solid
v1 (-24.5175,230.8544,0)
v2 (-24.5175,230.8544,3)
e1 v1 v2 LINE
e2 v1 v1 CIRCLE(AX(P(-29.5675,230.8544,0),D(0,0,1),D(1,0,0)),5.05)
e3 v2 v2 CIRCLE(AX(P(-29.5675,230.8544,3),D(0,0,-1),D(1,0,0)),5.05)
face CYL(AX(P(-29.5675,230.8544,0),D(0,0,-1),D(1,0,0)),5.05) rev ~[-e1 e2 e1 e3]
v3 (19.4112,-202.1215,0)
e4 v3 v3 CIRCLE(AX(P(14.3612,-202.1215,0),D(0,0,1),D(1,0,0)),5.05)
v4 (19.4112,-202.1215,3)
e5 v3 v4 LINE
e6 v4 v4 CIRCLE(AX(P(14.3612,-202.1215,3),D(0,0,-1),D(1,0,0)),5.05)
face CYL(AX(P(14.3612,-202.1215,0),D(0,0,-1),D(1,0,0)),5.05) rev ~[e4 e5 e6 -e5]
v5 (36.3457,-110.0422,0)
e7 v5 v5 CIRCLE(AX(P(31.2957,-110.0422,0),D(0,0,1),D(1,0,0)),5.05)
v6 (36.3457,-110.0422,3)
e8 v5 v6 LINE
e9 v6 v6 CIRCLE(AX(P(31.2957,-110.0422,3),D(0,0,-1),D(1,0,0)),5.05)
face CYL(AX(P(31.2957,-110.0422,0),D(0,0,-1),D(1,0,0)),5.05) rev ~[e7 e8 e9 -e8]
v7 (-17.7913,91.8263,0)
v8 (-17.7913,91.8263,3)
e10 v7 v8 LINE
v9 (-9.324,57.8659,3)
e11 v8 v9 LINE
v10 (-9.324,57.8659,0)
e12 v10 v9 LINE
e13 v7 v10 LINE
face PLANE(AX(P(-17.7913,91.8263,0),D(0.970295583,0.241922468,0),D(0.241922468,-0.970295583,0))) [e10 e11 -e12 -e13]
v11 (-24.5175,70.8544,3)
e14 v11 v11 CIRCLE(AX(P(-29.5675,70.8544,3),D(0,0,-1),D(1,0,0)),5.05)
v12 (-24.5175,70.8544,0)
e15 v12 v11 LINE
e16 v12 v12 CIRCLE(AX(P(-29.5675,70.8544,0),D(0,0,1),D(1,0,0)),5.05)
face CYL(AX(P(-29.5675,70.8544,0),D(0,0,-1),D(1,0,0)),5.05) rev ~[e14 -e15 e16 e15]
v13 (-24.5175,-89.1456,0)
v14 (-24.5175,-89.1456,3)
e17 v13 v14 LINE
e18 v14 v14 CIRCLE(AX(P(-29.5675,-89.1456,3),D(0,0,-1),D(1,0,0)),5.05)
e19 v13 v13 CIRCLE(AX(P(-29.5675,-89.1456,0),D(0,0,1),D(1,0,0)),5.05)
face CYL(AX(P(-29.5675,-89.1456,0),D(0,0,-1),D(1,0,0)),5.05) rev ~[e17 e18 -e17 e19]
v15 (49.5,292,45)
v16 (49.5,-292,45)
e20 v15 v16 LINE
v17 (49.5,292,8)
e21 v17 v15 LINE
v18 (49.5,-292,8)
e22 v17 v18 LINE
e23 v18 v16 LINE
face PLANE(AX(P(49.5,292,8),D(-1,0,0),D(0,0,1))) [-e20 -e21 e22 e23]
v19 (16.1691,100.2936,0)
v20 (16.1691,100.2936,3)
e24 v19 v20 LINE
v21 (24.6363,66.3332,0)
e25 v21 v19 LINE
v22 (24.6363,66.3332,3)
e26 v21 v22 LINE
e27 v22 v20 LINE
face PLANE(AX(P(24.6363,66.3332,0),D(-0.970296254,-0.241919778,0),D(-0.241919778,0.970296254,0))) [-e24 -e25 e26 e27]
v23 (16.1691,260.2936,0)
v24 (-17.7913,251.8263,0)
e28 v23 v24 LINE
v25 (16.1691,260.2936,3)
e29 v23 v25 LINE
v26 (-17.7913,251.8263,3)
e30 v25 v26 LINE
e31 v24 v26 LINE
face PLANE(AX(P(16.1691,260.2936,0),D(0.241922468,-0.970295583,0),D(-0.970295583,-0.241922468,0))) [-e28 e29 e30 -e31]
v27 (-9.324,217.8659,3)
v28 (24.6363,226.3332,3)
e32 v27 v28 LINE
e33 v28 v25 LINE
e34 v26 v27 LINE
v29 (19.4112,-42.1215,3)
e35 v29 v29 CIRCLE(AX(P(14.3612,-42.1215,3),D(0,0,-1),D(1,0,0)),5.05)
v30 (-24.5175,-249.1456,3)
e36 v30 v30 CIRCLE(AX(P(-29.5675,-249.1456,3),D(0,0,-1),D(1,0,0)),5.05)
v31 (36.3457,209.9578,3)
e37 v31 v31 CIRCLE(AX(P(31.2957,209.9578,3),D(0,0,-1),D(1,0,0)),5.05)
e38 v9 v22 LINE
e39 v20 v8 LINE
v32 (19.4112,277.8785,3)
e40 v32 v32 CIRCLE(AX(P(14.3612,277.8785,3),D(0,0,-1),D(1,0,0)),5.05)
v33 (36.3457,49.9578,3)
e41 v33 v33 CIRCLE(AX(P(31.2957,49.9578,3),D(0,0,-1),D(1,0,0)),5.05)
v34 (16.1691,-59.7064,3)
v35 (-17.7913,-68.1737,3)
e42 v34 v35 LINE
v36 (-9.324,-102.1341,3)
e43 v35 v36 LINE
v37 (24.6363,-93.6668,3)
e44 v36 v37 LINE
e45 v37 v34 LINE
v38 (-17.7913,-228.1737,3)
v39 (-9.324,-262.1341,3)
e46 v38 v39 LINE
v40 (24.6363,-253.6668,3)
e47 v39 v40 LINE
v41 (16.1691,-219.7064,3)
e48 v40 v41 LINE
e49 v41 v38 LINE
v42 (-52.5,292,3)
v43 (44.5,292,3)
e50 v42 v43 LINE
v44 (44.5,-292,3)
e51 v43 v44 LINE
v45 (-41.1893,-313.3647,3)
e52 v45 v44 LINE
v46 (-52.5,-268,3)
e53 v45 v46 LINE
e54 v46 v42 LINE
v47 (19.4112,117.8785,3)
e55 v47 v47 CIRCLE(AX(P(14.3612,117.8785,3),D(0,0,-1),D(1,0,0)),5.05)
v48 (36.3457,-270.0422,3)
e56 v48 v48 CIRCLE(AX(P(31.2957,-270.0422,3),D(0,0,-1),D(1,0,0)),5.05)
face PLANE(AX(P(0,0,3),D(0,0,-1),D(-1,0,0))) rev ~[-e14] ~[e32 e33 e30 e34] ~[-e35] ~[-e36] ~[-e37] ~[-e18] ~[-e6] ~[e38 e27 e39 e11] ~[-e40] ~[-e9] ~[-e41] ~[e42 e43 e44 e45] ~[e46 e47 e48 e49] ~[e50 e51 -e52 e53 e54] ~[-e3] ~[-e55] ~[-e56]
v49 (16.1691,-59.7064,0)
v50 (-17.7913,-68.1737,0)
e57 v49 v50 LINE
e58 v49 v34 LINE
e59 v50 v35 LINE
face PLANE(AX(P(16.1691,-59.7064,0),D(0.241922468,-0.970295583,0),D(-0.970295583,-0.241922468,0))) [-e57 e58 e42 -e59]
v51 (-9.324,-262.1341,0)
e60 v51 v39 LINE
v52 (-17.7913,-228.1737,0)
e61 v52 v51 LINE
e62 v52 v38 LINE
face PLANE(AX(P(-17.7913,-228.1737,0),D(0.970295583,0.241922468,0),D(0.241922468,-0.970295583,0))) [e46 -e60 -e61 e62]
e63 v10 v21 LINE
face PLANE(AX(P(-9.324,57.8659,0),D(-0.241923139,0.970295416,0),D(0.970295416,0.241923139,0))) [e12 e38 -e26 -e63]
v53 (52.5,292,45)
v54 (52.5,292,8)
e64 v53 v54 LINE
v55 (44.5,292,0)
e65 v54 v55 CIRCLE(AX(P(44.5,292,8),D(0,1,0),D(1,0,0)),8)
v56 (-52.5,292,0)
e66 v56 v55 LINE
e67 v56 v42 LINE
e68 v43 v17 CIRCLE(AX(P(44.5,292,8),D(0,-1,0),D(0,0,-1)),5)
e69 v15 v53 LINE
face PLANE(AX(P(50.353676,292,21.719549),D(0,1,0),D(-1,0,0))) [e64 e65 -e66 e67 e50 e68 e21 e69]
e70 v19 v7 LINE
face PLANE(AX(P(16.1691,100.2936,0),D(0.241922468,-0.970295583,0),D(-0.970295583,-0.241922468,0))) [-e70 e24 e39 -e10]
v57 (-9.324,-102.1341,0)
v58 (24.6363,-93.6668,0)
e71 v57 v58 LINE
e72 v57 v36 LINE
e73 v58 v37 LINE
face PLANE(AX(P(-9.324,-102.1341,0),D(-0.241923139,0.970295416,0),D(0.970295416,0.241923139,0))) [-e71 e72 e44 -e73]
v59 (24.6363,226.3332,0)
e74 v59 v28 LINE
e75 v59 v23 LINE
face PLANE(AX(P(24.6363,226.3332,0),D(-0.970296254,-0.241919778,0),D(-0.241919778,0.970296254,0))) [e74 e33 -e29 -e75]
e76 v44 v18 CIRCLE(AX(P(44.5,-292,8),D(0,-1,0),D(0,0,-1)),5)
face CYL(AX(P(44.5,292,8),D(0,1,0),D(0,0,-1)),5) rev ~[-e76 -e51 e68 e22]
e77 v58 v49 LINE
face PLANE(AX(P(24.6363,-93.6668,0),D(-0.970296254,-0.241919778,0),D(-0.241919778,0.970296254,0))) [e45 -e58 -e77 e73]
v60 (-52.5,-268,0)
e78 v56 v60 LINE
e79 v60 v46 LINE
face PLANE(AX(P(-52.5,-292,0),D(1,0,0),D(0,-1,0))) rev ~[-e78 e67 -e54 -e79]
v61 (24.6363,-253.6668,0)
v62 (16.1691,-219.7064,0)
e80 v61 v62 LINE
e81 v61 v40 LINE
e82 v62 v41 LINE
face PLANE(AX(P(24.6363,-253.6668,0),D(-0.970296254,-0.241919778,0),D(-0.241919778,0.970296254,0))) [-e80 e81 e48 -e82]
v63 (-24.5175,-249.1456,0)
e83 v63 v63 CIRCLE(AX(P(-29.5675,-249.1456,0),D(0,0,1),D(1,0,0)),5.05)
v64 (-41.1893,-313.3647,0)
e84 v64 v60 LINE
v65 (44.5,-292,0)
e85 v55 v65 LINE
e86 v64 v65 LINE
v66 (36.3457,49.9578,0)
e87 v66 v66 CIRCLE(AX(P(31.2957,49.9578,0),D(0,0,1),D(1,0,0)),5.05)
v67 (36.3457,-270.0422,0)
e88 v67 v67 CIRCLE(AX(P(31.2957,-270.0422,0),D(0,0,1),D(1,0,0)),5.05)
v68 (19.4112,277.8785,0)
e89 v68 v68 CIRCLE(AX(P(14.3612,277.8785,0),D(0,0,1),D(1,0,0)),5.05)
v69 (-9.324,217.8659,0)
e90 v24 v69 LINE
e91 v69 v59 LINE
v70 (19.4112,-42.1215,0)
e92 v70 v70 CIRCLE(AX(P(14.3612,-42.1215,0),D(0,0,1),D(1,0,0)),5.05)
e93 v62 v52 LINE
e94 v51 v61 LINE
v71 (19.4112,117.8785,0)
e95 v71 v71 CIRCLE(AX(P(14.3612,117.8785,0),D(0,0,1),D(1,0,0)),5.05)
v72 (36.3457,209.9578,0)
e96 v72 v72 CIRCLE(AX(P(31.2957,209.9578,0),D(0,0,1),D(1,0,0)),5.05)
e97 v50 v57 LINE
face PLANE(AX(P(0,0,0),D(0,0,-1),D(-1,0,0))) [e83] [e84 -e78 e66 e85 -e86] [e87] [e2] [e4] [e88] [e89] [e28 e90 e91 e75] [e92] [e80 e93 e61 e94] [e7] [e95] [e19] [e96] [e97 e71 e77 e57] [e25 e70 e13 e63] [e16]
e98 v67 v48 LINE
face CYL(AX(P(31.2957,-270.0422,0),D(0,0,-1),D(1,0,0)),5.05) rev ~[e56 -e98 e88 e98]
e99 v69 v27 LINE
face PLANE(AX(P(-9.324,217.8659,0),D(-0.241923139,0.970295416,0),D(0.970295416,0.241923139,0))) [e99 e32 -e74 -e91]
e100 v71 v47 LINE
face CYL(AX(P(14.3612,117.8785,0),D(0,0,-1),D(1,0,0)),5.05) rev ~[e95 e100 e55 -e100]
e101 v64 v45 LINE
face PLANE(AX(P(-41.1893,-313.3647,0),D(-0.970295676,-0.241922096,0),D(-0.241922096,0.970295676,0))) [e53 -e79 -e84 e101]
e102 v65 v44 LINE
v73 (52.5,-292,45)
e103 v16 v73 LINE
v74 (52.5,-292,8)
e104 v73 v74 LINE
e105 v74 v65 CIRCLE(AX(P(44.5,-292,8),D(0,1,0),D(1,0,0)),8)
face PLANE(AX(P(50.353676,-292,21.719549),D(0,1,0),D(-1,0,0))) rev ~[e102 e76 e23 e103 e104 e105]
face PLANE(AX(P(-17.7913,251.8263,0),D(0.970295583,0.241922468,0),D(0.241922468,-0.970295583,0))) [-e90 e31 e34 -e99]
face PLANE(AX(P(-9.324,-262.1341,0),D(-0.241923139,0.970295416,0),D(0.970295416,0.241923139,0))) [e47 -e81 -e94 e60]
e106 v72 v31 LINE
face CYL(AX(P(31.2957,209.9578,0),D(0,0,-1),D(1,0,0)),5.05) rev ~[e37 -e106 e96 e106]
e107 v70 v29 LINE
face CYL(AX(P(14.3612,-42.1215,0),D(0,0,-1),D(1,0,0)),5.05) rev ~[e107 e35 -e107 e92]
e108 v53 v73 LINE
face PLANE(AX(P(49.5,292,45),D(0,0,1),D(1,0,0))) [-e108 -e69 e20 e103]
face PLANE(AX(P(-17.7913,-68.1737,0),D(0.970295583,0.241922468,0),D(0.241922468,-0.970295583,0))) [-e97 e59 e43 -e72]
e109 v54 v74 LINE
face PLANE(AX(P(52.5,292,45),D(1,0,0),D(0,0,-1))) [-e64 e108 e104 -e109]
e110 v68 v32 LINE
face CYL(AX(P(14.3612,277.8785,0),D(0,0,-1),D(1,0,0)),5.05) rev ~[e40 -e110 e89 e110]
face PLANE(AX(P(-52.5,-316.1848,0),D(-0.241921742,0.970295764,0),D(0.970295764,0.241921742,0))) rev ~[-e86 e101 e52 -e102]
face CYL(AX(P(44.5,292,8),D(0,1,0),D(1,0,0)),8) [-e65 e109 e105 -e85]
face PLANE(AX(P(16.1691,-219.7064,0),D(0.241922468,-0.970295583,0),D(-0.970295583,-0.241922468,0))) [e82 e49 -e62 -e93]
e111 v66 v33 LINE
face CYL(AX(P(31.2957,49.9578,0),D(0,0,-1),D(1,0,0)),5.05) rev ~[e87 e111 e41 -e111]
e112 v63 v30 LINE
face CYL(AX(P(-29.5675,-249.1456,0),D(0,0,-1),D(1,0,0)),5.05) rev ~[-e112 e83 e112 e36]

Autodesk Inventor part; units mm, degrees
ref_plane "YZ Plane" through (0, 0, 0) normal (1, 0, 0) x (0, 1, 0)
ref_plane "XZ Plane" through (0, 0, 0) normal (0, 1, 0) x (-1, 0, 0)
ref_plane "XY Plane" through (0, 0, 0) normal (0, 0, 1) x (1, 0, 0)
sketch "Sketch1" plane through (0, 0, 0) normal (0, 0, 1) x (1, 0, 0)
  line L0 (-52.5, 292) -> (52.5, 292)
  line L1 (52.5, 292) -> (52.5, -292)
  line L2 (52.5, -292) -> (-52.5, -292)
  line L3 (-52.5, -292) -> (-52.5, 292)
  line L4 (-52.5, 292) -> (52.5, -292) construction
  point P0 (0, 0)
  point P1 (0, 0)
  dimension "d0" = 105
  dimension "d1" = 584
extrude "Plate1" add sketch "Sketch1" along normal blind 3
sketch "Sketch4" plane through (49.5, 292, 0) normal (1, 0, 0) x (0, 1, 0)
  line L0 (-584, 0) -> (0, 0)
  line L1 (0, 0) -> (0, 45)
  line L2 (0, 45) -> (-584, 45)
  line L3 (-584, 45) -> (-584, 0)
edge flange "Flange1" height 45 angle 90 thickness 3 bend radius 5 thickness toward (1, 0, 0) relief round relief width 3 relief depth 1.5 edges at (52.5, 0, 3) wall of the first edge with corners at (49.5, -292, 0) (49.5, 292, 0) (49.5, 292, 45) (49.5, -292, 45)
bend "Bend1"
corner "Corner1"
sketch "Sketch5" plane through (0, 0, 0) normal (0, 0, -1) x (-1, 0, 0)
  line L0 (-44.5, 292) -> (-44.5, -292) projected
  line L1 (52.5, -292) -> (-44.5, -292) projected
  line L2 (52.5, 292) -> (52.5, -292) projected
  line L3 (-44.5, 292) -> (52.5, 292) projected
  line L4 (52.5, -292) -> (52.5, -316.1848)
  line L5 (-44.5, -292) -> (52.5, -292) projected
  line L6 (52.5, -316.1848) -> (-44.5, -292)
  point P0 (0, 0)
  dimension "d25" = 14
extrude "Extrusion2" add sketch "Sketch5" against normal up to surface (3 mm away) contours L1 L4 L6
sketch "Sketch6" plane through (0, 0, 0) normal (0, 0, -1) x (-1, 0, 0)
  line L0 (-44.5, 292) -> (-44.5, -292) construction
  line L1 (-44.5, -292) -> (52.5, -316.1848) projected
  line L2 (52.5, 292) -> (52.5, -316.1848) projected
  line L3 (-44.5, 292) -> (52.5, 292) construction
  line L4 (41.1893, -313.3647) -> (52.5, -268)
  line L5 (-44.5, -292) -> (52.5, -316.1848) projected
  point P0 (0, 0)
  dimension "d45" = 560
extrude "Cut1" cut sketch "Sketch6" against normal blind 3
sketch "Sketch7" plane through (0, 0, 0) normal (0, 0, 1) x (1, 0, 0)
  line L0 (44.5, -292) -> (-41.1893, -313.3647) projected
  circle A0 centre (31.2957, -270.0422) radius 5.05
  line L1 (31.2957, -270.0422) -> (14.3612, -202.1215) construction
  line L2 (24.6363, -253.6668) -> (16.1691, -219.7064)
  circle A1 centre (14.3612, -202.1215) radius 5.05
  line L3 (-29.5675, -249.1456) -> (31.2957, -270.0422) construction
  line L4 (24.6363, -253.6668) -> (-17.7913, -228.1737) construction
  line L5 (16.1691, -219.7064) -> (-17.7913, -228.1737)
  line L6 (-9.324, -262.1341) -> (24.6363, -253.6668)
  line L7 (16.1691, -219.7064) -> (-9.324, -262.1341) construction
  line L8 (-17.7913, -228.1737) -> (-9.324, -262.1341)
  line L9 (20.4027, -236.6866) -> (-29.5675, -249.1456) construction
  line L10 (14.3612, -202.1215) -> (-29.5675, -249.1456) construction
  circle A2 centre (-29.5675, -249.1456) radius 5.05
  point P0 (0, 0)
  point P1 (3.4225, -240.9203)
  dimension "d32" = 35
  dimension "d33" = 35
  dimension "d34" = 10.1
  dimension "d35" = 70
  dimension "d36" = 54
  dimension "d37" = 20
  dimension "d38" = 10
  dimension "d39" = 42
extrude "Extrusion3" cut sketch "Sketch7" along normal through all
pattern_linear "Rectangular Pattern1" count 4 spacing 160 along (0, 1, 0) of "Extrusion3"
equation "\"d0\" = RIDGE_1_hight"
equation "\"d25\" = RIDGE_1_angle"
equation "\"d45\" = RIDGE_1_lenth"
equation "\"d30\" = Thickness"
equation "\"d33\" = d32"
equation "\"d2\" = Thickness"
equation "\"d15\" = BendReliefWidth"
equation "\"d16\" = BendReliefDepth"
equation "\"d17\" = MinimumRemnant"
equation "\"d18\" = TransitionRadius"
equation "\"d21\" = BendRadius"
equation "\"d22\" = CornerReliefSize"
equation "\"d23\" = GapSize"
equation "\"d24\" = JacobiRadiusSize"
equation "\"BendReliefWidth\" = Thickness"
equation "\"BendReliefDepth\" = 0.5 * Thickness"
equation "\"CornerReliefSize\" = 4 * Thickness"
equation "\"MinimumRemnant\" = 2 * Thickness"
equation "\"TransitionRadius\" = BendRadius"
equation "\"JacobiRadiusSize\" = BendRadius"
equation "\"GapSize\" = Thickness"
equation "\"RIDGE_1_hight\" = 105"
equation "\"RIDGE_1_angle\" = 14deg"
equation "\"RIDGE_1_lenth\" = 560"
equation "\"Thickness\" = 3"
equation "\"BendRadius\" = 5"
properties part number "DSB-103 Ridge top" material "Stainless Steel"
